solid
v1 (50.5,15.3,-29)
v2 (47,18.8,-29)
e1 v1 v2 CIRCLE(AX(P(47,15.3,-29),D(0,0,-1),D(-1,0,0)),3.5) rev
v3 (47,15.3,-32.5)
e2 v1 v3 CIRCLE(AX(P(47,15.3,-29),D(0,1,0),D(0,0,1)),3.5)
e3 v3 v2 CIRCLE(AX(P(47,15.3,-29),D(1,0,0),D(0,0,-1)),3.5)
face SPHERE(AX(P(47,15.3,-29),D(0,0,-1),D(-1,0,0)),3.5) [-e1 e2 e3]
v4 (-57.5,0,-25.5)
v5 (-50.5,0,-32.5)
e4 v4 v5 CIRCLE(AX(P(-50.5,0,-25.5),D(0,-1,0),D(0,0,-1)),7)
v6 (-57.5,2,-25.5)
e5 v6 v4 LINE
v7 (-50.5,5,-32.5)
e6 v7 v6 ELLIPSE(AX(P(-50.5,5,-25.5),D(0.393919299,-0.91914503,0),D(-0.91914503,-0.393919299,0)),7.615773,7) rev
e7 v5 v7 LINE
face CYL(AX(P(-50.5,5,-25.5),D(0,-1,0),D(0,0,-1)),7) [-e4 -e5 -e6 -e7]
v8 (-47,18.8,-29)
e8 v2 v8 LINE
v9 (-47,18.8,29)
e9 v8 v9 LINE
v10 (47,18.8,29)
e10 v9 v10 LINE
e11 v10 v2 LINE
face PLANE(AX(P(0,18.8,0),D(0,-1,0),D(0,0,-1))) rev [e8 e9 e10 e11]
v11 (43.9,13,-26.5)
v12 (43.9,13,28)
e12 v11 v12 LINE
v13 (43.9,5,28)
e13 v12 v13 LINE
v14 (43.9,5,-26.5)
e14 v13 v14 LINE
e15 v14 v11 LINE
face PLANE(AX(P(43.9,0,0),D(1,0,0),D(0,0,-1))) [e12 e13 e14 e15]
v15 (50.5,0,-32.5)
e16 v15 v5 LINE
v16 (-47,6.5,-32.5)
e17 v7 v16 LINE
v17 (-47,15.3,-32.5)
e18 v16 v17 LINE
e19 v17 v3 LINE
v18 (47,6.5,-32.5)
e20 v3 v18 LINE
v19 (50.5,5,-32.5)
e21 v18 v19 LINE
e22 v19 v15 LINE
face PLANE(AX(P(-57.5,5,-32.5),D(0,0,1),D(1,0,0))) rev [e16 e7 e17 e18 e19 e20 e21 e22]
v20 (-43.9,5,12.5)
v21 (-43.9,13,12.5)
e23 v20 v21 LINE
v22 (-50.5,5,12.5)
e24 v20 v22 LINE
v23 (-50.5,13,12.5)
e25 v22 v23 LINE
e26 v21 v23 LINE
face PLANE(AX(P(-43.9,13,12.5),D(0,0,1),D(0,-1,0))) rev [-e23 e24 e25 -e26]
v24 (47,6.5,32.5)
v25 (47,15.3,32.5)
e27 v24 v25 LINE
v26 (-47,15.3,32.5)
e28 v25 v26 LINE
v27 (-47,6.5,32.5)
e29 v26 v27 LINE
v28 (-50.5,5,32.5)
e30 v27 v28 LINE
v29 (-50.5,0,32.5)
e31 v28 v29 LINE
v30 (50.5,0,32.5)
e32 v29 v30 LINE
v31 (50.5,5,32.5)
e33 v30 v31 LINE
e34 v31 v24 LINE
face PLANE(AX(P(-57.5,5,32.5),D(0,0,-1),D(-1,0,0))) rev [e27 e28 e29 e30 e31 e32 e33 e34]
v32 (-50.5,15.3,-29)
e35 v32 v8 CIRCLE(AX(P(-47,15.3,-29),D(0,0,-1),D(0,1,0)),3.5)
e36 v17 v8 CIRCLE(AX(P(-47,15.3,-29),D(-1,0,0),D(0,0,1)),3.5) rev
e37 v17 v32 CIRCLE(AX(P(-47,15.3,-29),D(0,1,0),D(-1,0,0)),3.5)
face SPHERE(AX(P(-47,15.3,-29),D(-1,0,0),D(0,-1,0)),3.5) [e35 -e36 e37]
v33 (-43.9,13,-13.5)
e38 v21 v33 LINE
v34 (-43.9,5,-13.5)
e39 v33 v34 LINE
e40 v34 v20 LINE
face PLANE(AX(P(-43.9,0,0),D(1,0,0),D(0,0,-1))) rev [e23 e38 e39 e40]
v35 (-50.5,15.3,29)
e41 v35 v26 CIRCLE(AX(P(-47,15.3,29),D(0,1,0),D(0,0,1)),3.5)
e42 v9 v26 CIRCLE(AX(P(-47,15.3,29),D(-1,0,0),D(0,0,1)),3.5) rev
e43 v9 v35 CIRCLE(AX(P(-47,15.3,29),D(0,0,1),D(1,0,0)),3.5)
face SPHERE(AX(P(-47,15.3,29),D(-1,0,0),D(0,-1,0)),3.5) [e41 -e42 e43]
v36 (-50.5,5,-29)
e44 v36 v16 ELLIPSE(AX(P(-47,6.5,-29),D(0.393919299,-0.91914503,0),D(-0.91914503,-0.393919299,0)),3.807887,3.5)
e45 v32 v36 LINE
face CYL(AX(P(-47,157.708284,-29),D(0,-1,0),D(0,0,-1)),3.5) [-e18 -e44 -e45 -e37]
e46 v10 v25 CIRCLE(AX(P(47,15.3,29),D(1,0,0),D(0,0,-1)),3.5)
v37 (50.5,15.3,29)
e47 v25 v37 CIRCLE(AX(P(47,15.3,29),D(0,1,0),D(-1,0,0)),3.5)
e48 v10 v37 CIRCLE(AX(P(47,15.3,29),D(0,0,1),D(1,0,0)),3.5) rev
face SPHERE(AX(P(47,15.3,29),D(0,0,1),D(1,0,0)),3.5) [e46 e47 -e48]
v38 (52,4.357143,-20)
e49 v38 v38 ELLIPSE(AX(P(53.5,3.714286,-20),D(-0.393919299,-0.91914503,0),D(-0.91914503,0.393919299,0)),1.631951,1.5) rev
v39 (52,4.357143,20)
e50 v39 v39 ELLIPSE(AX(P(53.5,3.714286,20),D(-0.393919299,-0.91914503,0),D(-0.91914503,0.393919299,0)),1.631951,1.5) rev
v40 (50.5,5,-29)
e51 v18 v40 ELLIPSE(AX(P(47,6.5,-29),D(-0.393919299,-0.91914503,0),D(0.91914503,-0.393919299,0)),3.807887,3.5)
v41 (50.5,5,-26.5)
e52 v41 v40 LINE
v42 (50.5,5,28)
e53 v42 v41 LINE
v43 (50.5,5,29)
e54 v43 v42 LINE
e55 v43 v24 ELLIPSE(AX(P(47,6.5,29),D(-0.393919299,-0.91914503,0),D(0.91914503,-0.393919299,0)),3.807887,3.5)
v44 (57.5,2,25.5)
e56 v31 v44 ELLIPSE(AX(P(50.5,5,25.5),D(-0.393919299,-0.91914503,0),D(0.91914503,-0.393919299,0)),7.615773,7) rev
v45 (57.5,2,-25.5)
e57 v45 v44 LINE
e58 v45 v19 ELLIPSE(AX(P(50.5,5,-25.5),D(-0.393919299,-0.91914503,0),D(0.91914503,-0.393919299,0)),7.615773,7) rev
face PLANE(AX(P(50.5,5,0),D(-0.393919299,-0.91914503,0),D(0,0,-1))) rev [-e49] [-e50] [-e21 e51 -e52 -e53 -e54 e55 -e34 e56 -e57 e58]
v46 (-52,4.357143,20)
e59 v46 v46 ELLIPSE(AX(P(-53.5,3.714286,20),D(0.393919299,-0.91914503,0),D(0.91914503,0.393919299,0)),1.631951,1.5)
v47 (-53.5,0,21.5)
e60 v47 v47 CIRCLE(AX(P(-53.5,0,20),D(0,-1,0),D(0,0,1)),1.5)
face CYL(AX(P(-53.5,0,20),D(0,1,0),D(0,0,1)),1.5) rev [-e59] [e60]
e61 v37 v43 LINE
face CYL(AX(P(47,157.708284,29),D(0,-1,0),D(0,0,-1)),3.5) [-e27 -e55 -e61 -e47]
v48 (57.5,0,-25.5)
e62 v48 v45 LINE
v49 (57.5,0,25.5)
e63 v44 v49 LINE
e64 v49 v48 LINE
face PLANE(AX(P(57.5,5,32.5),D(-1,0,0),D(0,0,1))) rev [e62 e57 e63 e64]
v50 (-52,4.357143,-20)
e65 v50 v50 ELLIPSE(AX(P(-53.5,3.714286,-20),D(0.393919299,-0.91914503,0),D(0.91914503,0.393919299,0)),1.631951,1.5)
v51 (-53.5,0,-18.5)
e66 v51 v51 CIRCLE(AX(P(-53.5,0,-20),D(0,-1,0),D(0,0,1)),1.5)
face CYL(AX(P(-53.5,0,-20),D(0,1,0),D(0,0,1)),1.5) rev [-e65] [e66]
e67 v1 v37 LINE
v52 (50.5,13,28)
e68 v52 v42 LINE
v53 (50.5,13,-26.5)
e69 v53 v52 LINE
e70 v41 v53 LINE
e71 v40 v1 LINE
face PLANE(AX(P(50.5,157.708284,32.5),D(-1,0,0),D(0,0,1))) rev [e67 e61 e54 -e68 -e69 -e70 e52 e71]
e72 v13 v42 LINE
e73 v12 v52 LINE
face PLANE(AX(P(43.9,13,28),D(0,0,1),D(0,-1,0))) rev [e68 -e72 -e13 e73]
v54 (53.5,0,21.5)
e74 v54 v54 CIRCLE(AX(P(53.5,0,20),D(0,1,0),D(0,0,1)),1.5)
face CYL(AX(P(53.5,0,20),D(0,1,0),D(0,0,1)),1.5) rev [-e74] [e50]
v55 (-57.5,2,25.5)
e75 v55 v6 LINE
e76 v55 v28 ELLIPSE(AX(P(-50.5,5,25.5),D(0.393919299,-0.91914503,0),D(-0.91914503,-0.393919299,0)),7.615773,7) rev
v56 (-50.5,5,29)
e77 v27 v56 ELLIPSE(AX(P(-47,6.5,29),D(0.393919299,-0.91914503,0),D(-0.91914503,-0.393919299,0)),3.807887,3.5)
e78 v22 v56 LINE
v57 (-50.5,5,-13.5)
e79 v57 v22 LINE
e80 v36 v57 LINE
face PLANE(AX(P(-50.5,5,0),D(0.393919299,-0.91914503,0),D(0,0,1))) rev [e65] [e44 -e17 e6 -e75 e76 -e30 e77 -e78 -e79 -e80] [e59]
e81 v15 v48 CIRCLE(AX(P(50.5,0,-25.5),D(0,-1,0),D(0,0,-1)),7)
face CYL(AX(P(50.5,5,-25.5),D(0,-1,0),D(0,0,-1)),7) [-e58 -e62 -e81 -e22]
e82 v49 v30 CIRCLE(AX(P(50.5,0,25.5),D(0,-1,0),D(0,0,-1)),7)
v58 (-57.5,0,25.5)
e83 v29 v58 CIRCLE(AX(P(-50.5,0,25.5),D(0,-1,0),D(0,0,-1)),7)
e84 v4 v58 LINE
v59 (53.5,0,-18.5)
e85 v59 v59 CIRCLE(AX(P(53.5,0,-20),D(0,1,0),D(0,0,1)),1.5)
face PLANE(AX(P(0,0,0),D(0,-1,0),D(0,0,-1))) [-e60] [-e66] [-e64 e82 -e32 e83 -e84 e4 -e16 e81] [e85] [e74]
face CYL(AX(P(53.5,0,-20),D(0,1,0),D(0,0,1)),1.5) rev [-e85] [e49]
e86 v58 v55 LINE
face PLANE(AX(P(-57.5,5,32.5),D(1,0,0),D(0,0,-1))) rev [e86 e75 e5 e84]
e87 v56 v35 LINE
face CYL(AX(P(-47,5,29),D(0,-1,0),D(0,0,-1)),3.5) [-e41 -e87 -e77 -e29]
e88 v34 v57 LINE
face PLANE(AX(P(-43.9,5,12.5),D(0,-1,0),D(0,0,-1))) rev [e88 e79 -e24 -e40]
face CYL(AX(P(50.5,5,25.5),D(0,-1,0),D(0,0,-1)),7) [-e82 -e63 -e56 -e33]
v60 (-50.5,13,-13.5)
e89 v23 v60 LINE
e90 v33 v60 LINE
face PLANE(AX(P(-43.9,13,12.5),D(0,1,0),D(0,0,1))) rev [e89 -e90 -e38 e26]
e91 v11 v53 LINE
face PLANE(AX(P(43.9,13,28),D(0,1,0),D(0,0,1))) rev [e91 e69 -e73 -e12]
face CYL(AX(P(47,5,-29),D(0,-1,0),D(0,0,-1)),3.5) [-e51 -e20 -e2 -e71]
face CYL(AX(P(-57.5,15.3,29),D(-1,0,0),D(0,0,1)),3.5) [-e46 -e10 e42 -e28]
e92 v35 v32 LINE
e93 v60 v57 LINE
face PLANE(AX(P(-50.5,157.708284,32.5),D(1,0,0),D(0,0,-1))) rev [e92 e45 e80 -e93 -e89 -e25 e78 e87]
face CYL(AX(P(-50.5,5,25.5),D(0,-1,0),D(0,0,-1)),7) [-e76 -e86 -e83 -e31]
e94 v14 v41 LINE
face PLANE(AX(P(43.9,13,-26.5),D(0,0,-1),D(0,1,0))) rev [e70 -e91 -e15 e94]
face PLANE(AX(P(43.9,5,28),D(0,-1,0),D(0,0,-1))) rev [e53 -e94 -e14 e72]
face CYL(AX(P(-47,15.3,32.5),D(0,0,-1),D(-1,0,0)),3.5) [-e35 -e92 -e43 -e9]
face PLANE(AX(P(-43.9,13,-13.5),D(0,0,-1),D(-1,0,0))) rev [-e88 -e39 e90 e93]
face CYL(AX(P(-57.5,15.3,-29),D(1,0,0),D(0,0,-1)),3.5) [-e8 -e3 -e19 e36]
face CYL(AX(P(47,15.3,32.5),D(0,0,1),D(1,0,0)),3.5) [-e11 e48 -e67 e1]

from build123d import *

# Parameters (mm, degrees)
SKETCH1_W           = 115
SKETCH1_H           = 65
BOSS_EXTRUDE1_DEPTH = 5
SKETCH2_R           = 1.5
CUT_EXTRUDE1_DEPTH  = 67.238206497
CHAMFER1_SIZE       = 3
CHAMFER1_SIZE_2     = 7
FILLET1_R           = 7
SKETCH3_W           = 101
SKETCH3_H           = 65
BOSS_EXTRUDE2_DEPTH = 13.8
FILLET2_R           = 3.5
SKETCH4_W           = 26
SKETCH4_H           = 8
CUT_EXTRUDE2_DEPTH  = 6.6
SKETCH5_W           = 54.5
SKETCH5_H           = 8
CUT_EXTRUDE3_DEPTH  = 6.6


# Some blends are built 0.0001 mm under size
with BuildPart() as part:
    # Sketch1 → Boss-Extrude1 (new body)
    with BuildSketch(Plane(origin=(0, 0, 0), x_dir=(1, 0, 0), z_dir=(0, 1, 0))):
        Rectangle(SKETCH1_W, SKETCH1_H)
    extrude(amount=BOSS_EXTRUDE1_DEPTH)

    # Sketch2 → Cut-Extrude1 (cut, through all)
    with BuildSketch(Plane(origin=(0, 5, 0), x_dir=(1, 0, 0), z_dir=(0, 1, 0))):
        with Locations(Location((53.5, 20, 0), (0, 0, 270))):
            Circle(SKETCH2_R)
        with Locations(Location((53.5, -20, 0), (0, 0, 270))):
            Circle(SKETCH2_R)
    cut_extrude1 = extrude(amount=-CUT_EXTRUDE1_DEPTH, mode=Mode.SUBTRACT)

    # Mirror16: Cut-Extrude1 across plane
    add(cut_extrude1.mirror(Plane(origin=(0, 0, 0), x_dir=(0, 0, 1), z_dir=(1, 0, 0))), mode=Mode.SUBTRACT)

    # Chamfer1
    # the kernel refuses this chamfer: 7, 3 mm, written as the material it takes off along each edge
    with BuildSketch(Plane(origin=(-57.5, 5, -50.645496776), x_dir=(-0.08246287738523231, -0.9965941369752023, 0), z_dir=(0, 0, 1)), Plane(origin=(57.5, 5, 50.645496776), x_dir=(0.08246287738523231, -0.9965941369752023, 0), z_dir=(0, 0, -1))) as chamfer1_piece_1:
        Polygon((CHAMFER1_SIZE * 0.996594136975, CHAMFER1_SIZE * 0.0824628773852), (-CHAMFER1_SIZE_2 * 0.0824628773852, CHAMFER1_SIZE_2 * 0.996594136975), (0, 0), align=None)
    extrude(amount=101.290993551, mode=Mode.SUBTRACT)

    # Fillet1
    fillet1_edges = [part.edges().sort_by_distance(p)[0] for p in [
        (57.5, 1, -32.5),
        (57.5, 1, 32.5),
        (-57.5, 1, -32.5),
        (-57.5, 1, 32.5),
    ]]
    fillet(fillet1_edges, radius=FILLET1_R - 0.0001)  # a hair under: the kernel refuses the full size

    # Sketch3 → Boss-Extrude2 (add)
    with BuildSketch(Plane(origin=(0, 5, 0), x_dir=(1, 0, 0), z_dir=(0, 1, 0))):
        Rectangle(SKETCH3_W, SKETCH3_H)
    extrude(amount=BOSS_EXTRUDE2_DEPTH)

    # Fillet2
    fillet2_edges = [part.edges().sort_by_distance(p)[0] for p in [
        (0, 18.8, 32.5),
        (-50.5, 11.9, 32.5),
        (-50.5, 18.8, 0),
        (-50.5, 11.9, -32.5),
        (0, 18.8, -32.5),
        (50.5, 11.9, -32.5),
        (50.5, 18.8, 0),
        (50.5, 11.9, 32.5),
    ]]
    fillet(fillet2_edges, radius=FILLET2_R)

    # Sketch4 → Cut-Extrude2 (cut)
    with BuildSketch(Plane.ZY.offset(50.5)):
        with Locations((-0.5, 9)):
            Rectangle(SKETCH4_W, SKETCH4_H)
    extrude(amount=-CUT_EXTRUDE2_DEPTH, mode=Mode.SUBTRACT)

    # Sketch5 → Cut-Extrude3 (cut)
    with BuildSketch(Plane(origin=(50.5, 0, 0), x_dir=(0, 0, -1), z_dir=(1, 0, 0))):
        with Locations((-0.75, 9)):
            Rectangle(SKETCH5_W, SKETCH5_H)
    extrude(amount=-CUT_EXTRUDE3_DEPTH, mode=Mode.SUBTRACT)


solid = part.part
